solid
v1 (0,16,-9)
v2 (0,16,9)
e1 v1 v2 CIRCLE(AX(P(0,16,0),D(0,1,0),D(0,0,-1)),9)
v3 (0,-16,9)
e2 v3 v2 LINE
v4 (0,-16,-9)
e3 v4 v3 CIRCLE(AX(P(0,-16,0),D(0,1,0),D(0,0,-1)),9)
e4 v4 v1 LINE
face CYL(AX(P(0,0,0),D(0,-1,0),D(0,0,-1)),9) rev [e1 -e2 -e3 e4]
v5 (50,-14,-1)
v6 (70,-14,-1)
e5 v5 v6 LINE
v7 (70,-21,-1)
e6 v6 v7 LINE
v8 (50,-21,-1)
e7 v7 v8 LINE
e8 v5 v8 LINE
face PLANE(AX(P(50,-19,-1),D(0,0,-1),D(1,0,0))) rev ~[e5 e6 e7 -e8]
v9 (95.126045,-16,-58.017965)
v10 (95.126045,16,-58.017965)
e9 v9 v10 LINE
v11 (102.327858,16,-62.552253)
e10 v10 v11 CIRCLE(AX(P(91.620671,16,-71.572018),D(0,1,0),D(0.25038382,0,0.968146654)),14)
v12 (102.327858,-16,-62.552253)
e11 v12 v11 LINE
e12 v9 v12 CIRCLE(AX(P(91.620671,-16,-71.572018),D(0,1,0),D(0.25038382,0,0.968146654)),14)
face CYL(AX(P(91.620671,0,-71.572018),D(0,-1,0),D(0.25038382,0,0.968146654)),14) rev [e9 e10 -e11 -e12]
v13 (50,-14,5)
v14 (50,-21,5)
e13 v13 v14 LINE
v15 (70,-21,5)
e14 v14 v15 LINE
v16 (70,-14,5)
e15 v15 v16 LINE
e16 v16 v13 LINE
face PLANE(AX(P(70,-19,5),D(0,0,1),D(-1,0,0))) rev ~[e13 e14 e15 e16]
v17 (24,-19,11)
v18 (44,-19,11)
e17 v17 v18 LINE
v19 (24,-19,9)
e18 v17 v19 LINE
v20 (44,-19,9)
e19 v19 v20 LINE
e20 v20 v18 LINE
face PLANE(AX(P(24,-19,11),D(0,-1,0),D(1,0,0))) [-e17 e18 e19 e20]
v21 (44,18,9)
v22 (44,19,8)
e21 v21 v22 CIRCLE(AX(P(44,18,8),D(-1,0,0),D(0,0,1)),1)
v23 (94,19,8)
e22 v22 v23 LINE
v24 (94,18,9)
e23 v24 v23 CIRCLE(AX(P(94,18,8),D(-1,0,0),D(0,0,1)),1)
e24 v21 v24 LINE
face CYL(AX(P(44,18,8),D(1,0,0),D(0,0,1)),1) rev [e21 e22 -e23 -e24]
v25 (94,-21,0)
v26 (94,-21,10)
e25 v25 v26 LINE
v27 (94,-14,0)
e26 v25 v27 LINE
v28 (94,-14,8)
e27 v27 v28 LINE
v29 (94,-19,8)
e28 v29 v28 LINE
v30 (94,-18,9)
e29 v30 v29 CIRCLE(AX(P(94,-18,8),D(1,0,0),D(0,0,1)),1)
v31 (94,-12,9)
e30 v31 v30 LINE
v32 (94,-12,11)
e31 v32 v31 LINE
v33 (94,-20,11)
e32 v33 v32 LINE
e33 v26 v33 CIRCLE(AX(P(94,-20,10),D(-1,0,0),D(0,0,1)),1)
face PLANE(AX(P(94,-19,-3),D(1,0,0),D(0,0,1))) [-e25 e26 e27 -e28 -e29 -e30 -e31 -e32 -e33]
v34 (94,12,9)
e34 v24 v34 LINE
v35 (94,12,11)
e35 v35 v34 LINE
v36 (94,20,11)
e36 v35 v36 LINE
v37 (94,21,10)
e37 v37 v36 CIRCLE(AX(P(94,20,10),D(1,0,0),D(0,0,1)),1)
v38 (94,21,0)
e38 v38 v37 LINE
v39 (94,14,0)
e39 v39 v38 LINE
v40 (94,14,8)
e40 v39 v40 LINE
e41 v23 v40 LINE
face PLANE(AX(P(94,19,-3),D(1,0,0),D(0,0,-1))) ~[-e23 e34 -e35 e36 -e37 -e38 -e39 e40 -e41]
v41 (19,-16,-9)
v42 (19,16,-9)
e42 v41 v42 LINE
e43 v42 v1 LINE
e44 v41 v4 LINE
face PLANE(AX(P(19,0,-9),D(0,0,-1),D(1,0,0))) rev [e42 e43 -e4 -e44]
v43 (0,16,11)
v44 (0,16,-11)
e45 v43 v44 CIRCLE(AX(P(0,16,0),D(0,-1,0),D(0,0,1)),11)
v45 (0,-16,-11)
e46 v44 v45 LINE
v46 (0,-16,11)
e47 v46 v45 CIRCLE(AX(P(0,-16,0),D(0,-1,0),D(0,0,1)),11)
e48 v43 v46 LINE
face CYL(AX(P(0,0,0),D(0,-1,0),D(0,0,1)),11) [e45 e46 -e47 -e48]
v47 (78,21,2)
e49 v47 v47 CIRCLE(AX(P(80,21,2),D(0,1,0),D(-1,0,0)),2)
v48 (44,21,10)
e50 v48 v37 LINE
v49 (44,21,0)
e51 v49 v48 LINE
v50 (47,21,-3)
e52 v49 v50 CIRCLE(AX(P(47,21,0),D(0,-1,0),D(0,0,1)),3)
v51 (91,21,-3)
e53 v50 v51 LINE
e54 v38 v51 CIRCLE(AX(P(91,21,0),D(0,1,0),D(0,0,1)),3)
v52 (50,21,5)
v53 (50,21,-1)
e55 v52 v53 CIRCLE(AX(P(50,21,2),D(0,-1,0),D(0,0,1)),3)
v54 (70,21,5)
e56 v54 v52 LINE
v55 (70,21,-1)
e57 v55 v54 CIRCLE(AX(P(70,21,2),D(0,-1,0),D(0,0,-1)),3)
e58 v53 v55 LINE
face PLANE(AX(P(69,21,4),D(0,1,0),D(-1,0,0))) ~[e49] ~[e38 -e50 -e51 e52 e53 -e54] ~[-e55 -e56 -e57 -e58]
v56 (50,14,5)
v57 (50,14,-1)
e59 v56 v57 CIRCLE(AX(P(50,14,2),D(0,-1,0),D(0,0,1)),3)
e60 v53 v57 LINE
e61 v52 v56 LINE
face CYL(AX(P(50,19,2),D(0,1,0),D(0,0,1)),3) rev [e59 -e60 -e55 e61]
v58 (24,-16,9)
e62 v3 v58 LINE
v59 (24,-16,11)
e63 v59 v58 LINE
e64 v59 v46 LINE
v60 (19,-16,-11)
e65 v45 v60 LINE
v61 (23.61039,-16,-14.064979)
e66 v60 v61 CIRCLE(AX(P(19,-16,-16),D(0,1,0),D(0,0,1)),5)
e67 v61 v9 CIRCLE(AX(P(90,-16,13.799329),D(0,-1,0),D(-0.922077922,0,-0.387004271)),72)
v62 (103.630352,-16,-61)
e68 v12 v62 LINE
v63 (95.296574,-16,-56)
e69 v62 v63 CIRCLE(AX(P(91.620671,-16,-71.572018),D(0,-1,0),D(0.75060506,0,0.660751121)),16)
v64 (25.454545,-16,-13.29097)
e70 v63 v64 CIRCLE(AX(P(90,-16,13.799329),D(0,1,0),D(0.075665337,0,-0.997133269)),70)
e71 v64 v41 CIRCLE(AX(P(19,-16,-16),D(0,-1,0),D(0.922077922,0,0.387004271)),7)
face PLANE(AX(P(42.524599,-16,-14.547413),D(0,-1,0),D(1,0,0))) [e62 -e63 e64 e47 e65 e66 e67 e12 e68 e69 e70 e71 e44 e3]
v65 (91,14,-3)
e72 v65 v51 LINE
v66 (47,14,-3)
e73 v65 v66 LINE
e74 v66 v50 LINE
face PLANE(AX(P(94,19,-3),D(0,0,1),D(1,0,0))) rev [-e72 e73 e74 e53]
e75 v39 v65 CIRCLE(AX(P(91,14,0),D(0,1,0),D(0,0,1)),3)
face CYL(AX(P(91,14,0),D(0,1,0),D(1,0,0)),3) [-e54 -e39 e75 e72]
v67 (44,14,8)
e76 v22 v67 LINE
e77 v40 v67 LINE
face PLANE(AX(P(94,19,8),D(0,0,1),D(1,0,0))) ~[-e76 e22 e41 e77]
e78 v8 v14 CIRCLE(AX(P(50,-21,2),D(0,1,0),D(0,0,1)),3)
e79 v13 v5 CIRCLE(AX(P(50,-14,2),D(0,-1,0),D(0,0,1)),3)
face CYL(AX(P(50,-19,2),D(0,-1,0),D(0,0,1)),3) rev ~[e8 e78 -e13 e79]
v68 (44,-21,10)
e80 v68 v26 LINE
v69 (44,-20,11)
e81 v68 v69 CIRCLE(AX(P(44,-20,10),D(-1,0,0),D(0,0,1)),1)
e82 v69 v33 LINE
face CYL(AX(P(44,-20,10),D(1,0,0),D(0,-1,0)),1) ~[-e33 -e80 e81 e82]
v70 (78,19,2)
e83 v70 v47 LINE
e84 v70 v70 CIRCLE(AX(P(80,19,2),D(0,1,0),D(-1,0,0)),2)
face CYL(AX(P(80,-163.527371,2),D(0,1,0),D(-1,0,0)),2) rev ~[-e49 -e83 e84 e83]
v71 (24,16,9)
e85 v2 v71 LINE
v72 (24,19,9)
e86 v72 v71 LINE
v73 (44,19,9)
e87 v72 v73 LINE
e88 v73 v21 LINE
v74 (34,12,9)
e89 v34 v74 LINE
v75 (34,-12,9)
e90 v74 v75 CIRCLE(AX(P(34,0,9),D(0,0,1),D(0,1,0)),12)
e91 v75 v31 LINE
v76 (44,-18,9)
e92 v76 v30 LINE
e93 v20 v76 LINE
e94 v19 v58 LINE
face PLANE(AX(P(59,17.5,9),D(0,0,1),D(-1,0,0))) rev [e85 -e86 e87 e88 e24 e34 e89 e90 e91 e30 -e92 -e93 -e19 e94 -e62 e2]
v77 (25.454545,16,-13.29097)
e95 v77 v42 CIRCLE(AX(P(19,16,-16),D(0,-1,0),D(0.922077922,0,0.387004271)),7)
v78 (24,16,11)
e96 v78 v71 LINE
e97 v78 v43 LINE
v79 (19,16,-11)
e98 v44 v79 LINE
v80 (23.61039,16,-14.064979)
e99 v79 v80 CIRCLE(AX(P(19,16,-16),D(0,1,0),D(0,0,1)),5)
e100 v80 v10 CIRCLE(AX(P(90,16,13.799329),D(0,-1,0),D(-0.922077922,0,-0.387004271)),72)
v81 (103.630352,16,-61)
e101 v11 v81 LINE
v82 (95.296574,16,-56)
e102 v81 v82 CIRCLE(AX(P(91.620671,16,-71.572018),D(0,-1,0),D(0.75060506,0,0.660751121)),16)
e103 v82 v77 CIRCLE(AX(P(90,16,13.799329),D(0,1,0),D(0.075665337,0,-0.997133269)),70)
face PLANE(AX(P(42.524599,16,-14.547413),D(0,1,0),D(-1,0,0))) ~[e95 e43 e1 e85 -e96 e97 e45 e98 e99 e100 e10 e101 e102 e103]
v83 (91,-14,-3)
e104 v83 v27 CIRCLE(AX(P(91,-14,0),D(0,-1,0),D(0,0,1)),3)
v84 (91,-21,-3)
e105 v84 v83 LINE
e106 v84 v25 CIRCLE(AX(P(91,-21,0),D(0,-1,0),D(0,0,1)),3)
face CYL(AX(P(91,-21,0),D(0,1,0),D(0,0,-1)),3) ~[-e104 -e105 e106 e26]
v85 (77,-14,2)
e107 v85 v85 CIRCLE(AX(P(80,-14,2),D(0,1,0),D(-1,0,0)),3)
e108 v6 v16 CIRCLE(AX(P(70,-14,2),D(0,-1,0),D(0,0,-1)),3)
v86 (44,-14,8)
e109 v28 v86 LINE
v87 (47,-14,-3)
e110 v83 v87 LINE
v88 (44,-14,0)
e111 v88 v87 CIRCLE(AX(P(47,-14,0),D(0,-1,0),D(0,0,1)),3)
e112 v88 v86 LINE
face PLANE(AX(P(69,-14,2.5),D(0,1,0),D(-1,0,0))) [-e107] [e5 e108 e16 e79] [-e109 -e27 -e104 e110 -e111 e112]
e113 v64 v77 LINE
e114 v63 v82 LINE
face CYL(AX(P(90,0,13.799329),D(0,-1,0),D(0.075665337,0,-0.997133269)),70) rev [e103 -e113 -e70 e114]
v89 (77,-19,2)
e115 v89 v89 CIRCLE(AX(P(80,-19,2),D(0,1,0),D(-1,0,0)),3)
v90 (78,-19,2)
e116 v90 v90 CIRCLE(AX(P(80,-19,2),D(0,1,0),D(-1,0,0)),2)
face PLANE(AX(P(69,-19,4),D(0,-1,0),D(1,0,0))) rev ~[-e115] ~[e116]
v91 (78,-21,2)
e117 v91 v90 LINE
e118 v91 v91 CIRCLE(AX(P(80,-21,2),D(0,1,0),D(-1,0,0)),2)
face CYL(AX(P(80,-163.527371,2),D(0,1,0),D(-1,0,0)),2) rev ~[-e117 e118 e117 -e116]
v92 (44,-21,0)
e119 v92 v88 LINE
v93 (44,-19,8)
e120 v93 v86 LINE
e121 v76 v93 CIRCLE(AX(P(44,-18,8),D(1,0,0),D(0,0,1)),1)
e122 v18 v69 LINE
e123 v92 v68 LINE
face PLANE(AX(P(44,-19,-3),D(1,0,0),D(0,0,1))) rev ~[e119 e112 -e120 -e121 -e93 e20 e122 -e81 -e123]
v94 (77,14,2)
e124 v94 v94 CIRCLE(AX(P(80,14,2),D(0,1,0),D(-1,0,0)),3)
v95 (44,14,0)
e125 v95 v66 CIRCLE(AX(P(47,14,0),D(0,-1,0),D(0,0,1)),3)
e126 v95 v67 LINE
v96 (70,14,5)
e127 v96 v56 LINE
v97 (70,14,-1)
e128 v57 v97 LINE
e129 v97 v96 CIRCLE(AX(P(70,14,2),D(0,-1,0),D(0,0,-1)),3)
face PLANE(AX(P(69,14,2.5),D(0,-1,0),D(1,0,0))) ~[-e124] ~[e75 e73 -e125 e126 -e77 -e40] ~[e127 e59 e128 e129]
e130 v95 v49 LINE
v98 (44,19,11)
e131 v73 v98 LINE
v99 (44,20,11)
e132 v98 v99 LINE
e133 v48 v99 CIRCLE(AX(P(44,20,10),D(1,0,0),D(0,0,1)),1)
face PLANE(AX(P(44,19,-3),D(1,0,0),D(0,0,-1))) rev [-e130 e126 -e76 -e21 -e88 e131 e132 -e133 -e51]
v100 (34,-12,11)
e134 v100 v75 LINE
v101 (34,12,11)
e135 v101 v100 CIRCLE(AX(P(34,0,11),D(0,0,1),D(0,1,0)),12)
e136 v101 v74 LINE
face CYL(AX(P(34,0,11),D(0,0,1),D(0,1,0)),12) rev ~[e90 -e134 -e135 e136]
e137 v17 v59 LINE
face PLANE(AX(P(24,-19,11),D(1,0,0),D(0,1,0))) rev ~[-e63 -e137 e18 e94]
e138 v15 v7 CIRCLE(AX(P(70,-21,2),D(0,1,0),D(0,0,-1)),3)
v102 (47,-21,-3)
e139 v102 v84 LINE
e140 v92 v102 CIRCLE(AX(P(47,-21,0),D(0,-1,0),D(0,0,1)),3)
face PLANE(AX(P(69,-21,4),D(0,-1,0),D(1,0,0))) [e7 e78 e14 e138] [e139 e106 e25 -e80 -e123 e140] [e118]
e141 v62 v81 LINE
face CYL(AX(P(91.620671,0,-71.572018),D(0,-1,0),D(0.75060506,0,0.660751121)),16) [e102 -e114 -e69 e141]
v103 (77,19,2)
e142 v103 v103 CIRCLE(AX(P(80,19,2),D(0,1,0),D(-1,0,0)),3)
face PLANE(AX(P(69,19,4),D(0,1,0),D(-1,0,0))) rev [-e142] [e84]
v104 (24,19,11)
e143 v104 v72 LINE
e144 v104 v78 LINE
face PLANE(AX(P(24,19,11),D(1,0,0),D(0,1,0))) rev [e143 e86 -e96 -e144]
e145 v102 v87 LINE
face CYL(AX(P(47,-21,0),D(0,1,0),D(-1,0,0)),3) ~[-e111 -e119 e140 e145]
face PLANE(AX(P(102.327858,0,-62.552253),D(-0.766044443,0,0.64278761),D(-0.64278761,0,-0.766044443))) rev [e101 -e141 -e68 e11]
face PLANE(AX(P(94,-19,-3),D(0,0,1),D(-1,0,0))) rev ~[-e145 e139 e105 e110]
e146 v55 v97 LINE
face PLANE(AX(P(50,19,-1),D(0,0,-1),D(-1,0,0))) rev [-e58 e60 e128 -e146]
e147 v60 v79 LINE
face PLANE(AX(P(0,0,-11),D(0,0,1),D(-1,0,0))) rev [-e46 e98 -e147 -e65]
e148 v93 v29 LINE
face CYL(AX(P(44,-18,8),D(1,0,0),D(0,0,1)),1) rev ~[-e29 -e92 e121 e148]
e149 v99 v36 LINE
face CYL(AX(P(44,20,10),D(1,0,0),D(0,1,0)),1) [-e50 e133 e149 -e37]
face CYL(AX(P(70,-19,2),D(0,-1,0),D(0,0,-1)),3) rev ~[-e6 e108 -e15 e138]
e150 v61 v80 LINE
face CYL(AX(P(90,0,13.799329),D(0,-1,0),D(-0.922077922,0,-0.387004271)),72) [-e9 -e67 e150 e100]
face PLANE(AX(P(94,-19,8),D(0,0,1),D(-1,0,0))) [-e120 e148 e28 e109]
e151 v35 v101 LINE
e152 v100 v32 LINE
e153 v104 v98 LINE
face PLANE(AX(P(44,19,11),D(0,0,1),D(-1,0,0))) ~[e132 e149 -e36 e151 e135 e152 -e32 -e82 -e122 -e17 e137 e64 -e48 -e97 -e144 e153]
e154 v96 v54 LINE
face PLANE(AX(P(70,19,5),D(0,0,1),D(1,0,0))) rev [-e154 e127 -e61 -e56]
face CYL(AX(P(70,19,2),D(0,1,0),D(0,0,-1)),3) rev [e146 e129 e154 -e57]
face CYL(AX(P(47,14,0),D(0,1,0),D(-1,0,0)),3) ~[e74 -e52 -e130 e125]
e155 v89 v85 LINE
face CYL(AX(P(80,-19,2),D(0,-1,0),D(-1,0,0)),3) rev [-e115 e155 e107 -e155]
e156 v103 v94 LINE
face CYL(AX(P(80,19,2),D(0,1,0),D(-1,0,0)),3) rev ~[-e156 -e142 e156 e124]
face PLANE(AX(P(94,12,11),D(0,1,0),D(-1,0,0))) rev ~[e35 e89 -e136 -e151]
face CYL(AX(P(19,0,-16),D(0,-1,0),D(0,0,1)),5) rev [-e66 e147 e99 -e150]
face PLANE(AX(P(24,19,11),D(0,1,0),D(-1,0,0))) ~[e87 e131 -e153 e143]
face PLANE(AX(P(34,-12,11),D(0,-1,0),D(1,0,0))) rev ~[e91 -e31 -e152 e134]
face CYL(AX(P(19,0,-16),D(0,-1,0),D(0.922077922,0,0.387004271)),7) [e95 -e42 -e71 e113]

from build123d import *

# Parameters (mm, degrees)
F1_DEPTH       = 16
F2_W           = 70
F2_H           = 3
F3_DEPTH       = 2
F4_W           = 50
F4_H           = 14
F5_DEPTH       = 2
F6_R           = 1
F9_DEPTH       = 2
F11_DEPTH      = 21.001
F11_DEPTH_BACK = 25
F13_D          = 4
F14_W          = 50
F14_H          = 11
F14_R          = 3
F15_DEPTH      = 5
F16_R          = 3


# Not quite as in the source:
# - a pattern or mirror of a feature is missing from the dataset's text; its kind, count and spacing are read off the source's solid


with BuildPart() as f1:
    # F0 (on Front) → F1 (new body)
    with BuildSketch(Plane.XZ):
        with BuildLine():
            ThreePointArc((0, -9), (-9, 0), (0, 9))
            Line((0, 9), (94, 9))
            Line((94, 9), (94, 11))
            Line((94, 11), (0, 11))
            ThreePointArc((0, 11), (-11, 0), (0, -11))
            Line((0, -11), (19, -11))
            ThreePointArc((19, -11), (21.7681124643, -11.8361612201), (23.6103896104, -14.064978646))
            ThreePointArc((23.6103896104, -14.064978646), (52.3002338891, -47.5417473959), (95.1260447976, -58.0179647813))
            ThreePointArc((95.1260447976, -58.0179647813), (99.0798371754, -59.7246197028), (102.3278575446, -62.552252789))
            Line((102.3278575446, -62.552252789), (103.6303522873, -61))
            ThreePointArc((103.6303522873, -61), (99.852279938, -57.8519370421), (95.2965735981, -56))
            ThreePointArc((95.2965735981, -56), (53.4811996085, -45.9198240056), (25.4545454545, -13.2909701044))
            ThreePointArc((25.4545454545, -13.2909701044), (22.87535745, -10.1706257081), (19, -9))
            Line((19, -9), (0, -9))
        make_face()
    extrude(amount=F1_DEPTH)

    # F2 (on face) → F3 (join)
    with BuildSketch(Plane.XY.offset(11)):
        with Locations((59, -17.5)):
            Rectangle(F2_W, F2_H)
    extrude(amount=-F3_DEPTH)

    # F4 (on face) → F5 (join)
    with BuildSketch(Plane.XZ.offset(19)):
        with Locations((69, 4)):
            Rectangle(F4_W, F4_H)
    extrude(amount=F5_DEPTH)

    # F6
    f6_edges = [f1.edges().sort_by_distance(p)[0] for p in [
        (69, -21, 11),
        (69, -19, 9),
    ]]
    fillet(f6_edges, radius=F6_R)

    # F7: F1 across plane


with BuildPart() as f1_1:
    add(f1.part)
    add(f1.part.mirror(Plane.XZ))

    # F8 (on face) → F9 (cut)
    with BuildSketch(Plane.XY.offset(11)):
        with BuildLine():
            Line((94, 12), (34, 12))
            ThreePointArc((34, 12), (22, 0), (34, -12))
            Line((34, -12), (94, -12))
            Line((94, -12), (94, 12))
        make_face()
    extrude(amount=-F9_DEPTH, mode=Mode.SUBTRACT)

    # F10 (on Front) → F11 (cut, two sides)
    with BuildSketch(Plane.XZ) as f11_sk:
        with BuildLine():
            ThreePointArc((50, 5), (47, 2), (50, -1))
            Line((50, -1), (70, -1))
            ThreePointArc((70, -1), (73, 2), (70, 5))
            Line((70, 5), (50, 5))
        make_face()
    extrude(amount=-F11_DEPTH, mode=Mode.SUBTRACT)
    extrude(f11_sk.sketch, amount=F11_DEPTH_BACK, mode=Mode.SUBTRACT)

    # F13 (through all)
    with Locations(Plane.XZ.offset(21)):
        with Locations((80, 2)):
            Hole(F13_D / 2)

    # F14 (on face) → F15 (join)
    with BuildSketch(Plane(origin=(0, -19, 0), x_dir=(-1, 0, 0), z_dir=(0, 1, 0))):
        with Locations((-69, 2.5)):
            Rectangle(F14_W, F14_H)
        with Locations((-80, 2)):
            Circle(F14_R, mode=Mode.SUBTRACT)
        with BuildLine():
            Line((-70, 5), (-50, 5))
            ThreePointArc((-50, 5), (-47, 2), (-50, -1))
            Line((-50, -1), (-70, -1))
            ThreePointArc((-70, -1), (-73, 2), (-70, 5))
        make_face(mode=Mode.SUBTRACT)
    f15 = extrude(amount=F15_DEPTH)

    # F15_copies: F15 across plane
    add(f15.mirror(Plane.ZX))

    # F16
    f16_edges = [f1_1.edges().sort_by_distance(p)[0] for p in [
        (44, -17.5, -3),
        (94, -17.5, -3),
        (44, 17.5, -3),
        (94, 17.5, -3),
    ]]
    fillet(f16_edges, radius=F16_R)


solid = f1_1.part
